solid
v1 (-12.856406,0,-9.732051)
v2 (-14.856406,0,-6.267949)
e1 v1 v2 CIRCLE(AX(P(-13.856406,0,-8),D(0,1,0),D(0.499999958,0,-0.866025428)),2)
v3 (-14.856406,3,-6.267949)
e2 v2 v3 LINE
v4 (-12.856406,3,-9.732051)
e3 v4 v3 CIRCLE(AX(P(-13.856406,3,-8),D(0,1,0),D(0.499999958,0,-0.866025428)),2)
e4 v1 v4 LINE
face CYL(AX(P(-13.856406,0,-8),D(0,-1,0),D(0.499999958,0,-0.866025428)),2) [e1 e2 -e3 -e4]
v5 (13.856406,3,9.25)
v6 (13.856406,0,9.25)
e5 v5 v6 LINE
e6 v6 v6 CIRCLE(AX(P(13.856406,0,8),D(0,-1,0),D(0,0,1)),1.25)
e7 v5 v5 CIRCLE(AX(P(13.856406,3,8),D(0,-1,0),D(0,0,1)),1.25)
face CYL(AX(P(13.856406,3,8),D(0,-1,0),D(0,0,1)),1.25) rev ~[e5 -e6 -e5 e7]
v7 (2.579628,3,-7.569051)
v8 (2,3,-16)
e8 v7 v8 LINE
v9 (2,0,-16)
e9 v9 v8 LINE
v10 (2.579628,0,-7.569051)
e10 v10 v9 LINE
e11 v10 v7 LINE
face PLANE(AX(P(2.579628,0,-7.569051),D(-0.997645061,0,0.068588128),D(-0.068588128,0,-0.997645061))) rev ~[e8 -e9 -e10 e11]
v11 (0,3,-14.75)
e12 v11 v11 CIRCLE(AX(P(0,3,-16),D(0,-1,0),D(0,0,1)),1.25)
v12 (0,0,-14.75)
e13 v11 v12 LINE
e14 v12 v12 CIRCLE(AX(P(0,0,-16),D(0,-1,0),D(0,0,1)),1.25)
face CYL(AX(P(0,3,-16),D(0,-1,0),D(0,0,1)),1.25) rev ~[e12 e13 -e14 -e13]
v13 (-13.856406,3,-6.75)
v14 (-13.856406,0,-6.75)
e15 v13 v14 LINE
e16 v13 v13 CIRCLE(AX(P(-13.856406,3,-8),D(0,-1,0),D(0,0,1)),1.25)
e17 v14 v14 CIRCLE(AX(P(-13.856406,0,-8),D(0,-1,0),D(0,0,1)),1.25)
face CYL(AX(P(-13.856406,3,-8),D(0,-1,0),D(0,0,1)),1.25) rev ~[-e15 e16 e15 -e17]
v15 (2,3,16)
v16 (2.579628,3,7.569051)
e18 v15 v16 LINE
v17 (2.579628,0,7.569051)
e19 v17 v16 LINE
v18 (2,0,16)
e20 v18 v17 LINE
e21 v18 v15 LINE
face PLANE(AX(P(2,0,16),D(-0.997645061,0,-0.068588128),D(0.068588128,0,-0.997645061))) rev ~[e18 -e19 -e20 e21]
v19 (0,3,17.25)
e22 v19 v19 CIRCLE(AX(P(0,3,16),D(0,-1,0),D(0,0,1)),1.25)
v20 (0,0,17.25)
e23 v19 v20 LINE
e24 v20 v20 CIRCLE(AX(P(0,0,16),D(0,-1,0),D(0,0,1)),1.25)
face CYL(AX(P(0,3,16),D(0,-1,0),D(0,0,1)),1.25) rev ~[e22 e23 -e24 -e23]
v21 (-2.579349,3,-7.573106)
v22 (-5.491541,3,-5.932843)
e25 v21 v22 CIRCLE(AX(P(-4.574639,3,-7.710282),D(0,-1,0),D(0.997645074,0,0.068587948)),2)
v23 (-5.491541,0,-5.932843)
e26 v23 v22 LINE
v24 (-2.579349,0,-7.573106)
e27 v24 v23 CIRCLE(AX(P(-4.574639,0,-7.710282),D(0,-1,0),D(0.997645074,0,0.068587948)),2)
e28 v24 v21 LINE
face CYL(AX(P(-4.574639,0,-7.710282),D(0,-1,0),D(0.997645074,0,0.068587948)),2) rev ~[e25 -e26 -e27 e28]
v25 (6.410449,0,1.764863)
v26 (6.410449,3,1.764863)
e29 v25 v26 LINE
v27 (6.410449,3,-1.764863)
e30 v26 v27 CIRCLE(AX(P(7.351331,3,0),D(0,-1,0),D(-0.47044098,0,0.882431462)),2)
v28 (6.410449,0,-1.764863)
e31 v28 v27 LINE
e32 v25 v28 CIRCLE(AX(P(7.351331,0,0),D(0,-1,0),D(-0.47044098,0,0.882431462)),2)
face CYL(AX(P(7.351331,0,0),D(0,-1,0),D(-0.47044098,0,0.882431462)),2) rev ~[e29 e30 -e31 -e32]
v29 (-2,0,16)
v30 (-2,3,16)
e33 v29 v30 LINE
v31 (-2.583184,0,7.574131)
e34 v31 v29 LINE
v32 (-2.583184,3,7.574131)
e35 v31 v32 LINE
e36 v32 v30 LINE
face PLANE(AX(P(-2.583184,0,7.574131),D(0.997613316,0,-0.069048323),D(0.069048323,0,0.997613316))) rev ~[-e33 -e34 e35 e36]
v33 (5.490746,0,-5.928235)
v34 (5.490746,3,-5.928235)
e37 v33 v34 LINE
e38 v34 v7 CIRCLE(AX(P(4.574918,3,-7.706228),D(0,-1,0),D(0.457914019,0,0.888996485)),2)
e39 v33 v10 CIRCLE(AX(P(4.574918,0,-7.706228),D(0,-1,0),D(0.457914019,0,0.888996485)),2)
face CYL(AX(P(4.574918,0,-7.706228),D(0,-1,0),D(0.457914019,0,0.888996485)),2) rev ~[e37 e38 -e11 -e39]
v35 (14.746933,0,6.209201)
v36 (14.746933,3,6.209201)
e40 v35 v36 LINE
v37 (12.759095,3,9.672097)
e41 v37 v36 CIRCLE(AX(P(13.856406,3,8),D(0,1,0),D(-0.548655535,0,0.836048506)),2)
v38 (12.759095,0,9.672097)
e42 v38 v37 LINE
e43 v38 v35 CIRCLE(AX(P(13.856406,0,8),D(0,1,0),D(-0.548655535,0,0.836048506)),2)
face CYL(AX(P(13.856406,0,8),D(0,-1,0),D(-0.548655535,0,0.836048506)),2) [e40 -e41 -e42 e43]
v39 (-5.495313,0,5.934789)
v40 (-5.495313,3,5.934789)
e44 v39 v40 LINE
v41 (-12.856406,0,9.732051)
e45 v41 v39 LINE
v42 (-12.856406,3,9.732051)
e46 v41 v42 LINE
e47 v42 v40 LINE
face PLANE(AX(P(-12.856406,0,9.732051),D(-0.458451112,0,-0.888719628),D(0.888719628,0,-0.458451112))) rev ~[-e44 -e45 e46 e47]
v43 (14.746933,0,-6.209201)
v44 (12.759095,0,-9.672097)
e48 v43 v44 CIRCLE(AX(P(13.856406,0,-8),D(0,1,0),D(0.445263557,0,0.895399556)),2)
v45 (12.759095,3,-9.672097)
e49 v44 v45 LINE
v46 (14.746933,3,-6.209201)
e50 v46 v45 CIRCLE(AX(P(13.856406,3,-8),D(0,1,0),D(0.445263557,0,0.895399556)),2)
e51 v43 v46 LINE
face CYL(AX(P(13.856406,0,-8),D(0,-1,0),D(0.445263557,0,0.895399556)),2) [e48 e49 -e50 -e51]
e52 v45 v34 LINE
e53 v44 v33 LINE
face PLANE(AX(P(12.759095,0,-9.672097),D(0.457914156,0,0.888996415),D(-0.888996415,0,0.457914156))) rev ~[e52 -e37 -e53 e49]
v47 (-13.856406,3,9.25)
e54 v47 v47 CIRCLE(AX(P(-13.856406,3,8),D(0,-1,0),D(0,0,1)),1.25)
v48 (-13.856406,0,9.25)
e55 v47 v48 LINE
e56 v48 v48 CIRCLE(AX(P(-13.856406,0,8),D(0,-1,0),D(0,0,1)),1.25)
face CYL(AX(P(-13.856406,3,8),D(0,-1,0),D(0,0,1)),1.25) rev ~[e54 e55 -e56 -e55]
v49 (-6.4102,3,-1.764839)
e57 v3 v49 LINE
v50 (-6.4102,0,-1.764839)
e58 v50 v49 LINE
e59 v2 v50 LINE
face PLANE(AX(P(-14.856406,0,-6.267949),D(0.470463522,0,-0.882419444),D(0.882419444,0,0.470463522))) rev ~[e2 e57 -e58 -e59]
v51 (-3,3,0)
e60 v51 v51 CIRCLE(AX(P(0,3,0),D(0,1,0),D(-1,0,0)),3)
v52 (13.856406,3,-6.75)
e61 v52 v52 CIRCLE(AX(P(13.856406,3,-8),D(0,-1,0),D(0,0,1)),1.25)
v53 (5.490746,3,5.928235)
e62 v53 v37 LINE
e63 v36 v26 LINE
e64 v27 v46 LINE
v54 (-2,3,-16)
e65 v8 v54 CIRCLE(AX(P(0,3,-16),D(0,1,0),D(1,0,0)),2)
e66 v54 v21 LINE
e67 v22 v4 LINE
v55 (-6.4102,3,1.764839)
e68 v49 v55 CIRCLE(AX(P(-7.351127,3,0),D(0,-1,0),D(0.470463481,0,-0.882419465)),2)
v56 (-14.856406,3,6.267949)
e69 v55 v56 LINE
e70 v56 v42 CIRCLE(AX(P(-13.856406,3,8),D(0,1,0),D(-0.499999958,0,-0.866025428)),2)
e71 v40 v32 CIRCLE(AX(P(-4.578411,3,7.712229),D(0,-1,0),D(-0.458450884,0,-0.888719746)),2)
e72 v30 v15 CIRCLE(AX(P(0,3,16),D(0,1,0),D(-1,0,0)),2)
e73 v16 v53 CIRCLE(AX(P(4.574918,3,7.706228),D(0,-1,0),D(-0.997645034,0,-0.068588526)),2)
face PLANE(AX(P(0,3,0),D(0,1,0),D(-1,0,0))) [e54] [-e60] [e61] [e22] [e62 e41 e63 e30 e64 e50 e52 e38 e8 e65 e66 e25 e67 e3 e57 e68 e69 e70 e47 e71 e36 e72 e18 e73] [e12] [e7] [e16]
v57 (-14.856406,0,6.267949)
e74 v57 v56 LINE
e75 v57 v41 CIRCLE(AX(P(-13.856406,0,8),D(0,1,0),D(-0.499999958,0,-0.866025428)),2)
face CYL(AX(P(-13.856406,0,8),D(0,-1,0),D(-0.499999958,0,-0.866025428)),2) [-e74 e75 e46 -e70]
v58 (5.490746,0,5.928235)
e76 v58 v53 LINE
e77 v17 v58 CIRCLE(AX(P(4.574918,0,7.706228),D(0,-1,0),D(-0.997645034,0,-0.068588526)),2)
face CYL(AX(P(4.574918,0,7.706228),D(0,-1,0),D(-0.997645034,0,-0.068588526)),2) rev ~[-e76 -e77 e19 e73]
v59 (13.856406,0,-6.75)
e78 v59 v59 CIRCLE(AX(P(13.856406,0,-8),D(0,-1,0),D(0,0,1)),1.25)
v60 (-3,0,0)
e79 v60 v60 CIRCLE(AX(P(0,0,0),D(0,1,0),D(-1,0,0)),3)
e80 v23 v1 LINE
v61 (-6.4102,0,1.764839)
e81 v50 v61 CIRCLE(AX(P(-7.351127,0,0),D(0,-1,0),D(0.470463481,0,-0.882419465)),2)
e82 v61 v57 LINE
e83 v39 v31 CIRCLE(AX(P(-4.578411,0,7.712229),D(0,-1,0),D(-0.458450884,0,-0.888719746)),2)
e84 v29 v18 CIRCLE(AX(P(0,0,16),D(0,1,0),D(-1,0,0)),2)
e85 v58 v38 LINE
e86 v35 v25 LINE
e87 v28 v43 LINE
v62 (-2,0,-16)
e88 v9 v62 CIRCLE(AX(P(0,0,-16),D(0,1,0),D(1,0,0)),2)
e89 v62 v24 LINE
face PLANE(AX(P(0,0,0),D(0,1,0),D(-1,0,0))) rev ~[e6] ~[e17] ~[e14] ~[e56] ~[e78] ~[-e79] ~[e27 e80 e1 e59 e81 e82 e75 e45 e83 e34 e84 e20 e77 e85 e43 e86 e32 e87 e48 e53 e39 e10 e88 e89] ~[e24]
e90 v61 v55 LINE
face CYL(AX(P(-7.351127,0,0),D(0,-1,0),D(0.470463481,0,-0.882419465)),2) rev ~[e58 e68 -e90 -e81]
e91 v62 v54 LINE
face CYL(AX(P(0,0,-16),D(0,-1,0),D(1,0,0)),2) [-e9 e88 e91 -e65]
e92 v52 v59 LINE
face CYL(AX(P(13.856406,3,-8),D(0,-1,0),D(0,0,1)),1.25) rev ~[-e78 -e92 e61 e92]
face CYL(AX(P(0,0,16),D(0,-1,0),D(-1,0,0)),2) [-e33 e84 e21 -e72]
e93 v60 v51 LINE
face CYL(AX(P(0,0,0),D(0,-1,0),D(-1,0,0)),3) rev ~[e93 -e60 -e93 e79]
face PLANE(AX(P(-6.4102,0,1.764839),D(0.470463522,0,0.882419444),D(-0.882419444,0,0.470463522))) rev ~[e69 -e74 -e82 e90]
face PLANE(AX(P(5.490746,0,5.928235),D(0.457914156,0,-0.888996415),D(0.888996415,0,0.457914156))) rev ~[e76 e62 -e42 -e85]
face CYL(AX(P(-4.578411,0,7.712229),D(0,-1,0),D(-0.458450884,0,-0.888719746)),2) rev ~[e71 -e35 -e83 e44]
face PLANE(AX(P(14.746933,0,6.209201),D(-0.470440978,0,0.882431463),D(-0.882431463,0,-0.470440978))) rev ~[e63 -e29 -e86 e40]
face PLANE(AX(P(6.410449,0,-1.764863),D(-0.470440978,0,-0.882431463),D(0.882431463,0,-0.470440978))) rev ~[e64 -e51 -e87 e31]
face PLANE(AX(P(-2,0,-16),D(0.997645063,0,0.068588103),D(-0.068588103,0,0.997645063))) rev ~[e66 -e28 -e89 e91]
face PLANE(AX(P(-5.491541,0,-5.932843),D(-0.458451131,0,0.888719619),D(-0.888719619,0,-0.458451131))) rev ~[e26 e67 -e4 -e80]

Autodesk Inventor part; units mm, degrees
ref_plane "YZ Plane" through (0, 0, 0) normal (1, 0, 0) x (0, 1, 0)
ref_plane "XZ Plane" through (0, 0, 0) normal (0, 1, 0) x (-1, 0, 0)
ref_plane "XY Plane" through (0, 0, 0) normal (0, 0, 1) x (1, 0, 0)
sketch "Boceto1" plane through (0, 0, 0) normal (0, 1, 0) x (-1, 0, 0)
  circle A0 centre (0, -16) radius 2
  circle A1 centre (13.856406, -8) radius 2
  circle A2 centre (13.856406, 8) radius 2
  circle A3 centre (0, 16) radius 2
  circle A4 centre (-13.856406, 8) radius 2
  circle A5 centre (-13.856406, -8) radius 2
  line L0 (-12.759095, -9.672097) -> (-5.490746, -5.928235)
  line L1 (-6.410449, -1.764863) -> (-14.746933, -6.209201)
  line L2 (-6.410449, 1.764863) -> (-14.746933, 6.209201)
  line L3 (-12.759095, 9.672097) -> (-5.490746, 5.928235)
  line L4 (2, 16) -> (2.583184, 7.574131)
  line L5 (-2, 16) -> (-2.579628, 7.569051)
  line L6 (2.579349, -7.573106) -> (2, -16)
  line L7 (-2.579628, -7.569051) -> (-2, -16)
  line L8 (12.856406, 9.732051) -> (5.495313, 5.934789)
  line L9 (14.856406, 6.267949) -> (6.4102, 1.764839)
  line L10 (14.856406, -6.267949) -> (6.4102, -1.764839)
  line L11 (12.856406, -9.732051) -> (5.491541, -5.932843)
  circle A6 centre (0, 0) radius 3
  arc A7 (-6.410449, -1.764863) -> (-6.410449, 1.764863) centre (-7.351331, 0) ccw
  arc A8 (-2.579628, -7.569051) -> (-5.490746, -5.928235) centre (-4.574918, -7.706228) ccw
  arc A9 (5.491541, -5.932843) -> (2.579349, -7.573106) centre (4.574639, -7.710282) ccw
  arc A10 (6.4102, 1.764839) -> (6.4102, -1.764839) centre (7.351127, 0) ccw
  arc A11 (2.583184, 7.574131) -> (5.495313, 5.934789) centre (4.578411, 7.712228) ccw
  arc A12 (-5.490746, 5.928235) -> (-2.579628, 7.569051) centre (-4.574918, 7.706228) ccw
  point P0 (0, -3.1)
  point P1 (-3.1, 0)
  point P2 (0, 3.1)
  point P3 (3.1, 0)
  dimension "d17" = 360
  dimension "d19" = 6
  dimension "d20" = 2
sketch "Boceto1 outline for Extrusión1" plane through (0, 0, 0) normal (0, 1, 0) x (-1, 0, 0)
  arc A0 (5.495313, 5.934789) -> (2.583184, 7.574131) centre (4.578411, 7.712228) cw
  line L0 (12.856406, 9.732051) -> (5.495313, 5.934789)
  line L1 (2.583184, 7.574131) -> (2, 16)
  arc A1 (14.856406, 6.267949) -> (12.856406, 9.732051) centre (13.856406, 8) ccw
  arc A2 (2, 16) -> (-2, 16) centre (0, 16) ccw
  line L2 (6.4102, 1.764839) -> (14.856406, 6.267949)
  line L3 (-2, 16) -> (-2.579628, 7.569051)
  arc A3 (6.4102, -1.764839) -> (6.4102, 1.764839) centre (7.351127, 0) cw
  arc A4 (-2.579628, 7.569051) -> (-5.490746, 5.928235) centre (-4.574918, 7.706228) cw
  line L4 (14.856406, -6.267949) -> (6.4102, -1.764839)
  line L5 (-5.490746, 5.928235) -> (-12.759095, 9.672097)
  arc A5 (12.856406, -9.732051) -> (14.856406, -6.267949) centre (13.856406, -8) ccw
  arc A6 (-12.759095, 9.672097) -> (-14.746933, 6.209201) centre (-13.856406, 8) ccw
  line L6 (5.491541, -5.932843) -> (12.856406, -9.732051)
  line L7 (-14.746933, 6.209201) -> (-6.410449, 1.764863)
  arc A7 (2.579349, -7.573106) -> (5.491541, -5.932843) centre (4.574639, -7.710282) cw
  arc A8 (-6.410449, 1.764863) -> (-6.410449, -1.764863) centre (-7.351331, 0) cw
  line L8 (2, -16) -> (2.579349, -7.573106)
  line L9 (-6.410449, -1.764863) -> (-14.746933, -6.209201)
  arc A9 (-2, -16) -> (2, -16) centre (0, -16) ccw
  arc A10 (-14.746933, -6.209201) -> (-12.759095, -9.672097) centre (-13.856406, -8) ccw
  line L10 (-2.579628, -7.569051) -> (-2, -16)
  line L11 (-12.759095, -9.672097) -> (-5.490746, -5.928235)
  arc A11 (-5.490746, -5.928235) -> (-2.579628, -7.569051) centre (-4.574918, -7.706228) cw
  circle A12 centre (0, 0) radius 3
extrude "Extrusión1" add sketch "Boceto1 outline for Extrusión1" along normal blind 3
sketch "Boceto2" plane through (0, 3, 0) normal (0, 1, 0) x (1, 0, 0)
  arc A0 (-14.856406, -6.267949) -> (-12.856406, -9.732051) centre (-13.856406, -8) ccw
  circle A1 centre (-13.856406, -8) radius 1.25
  arc A2 (-2, -16) -> (2, -16) centre (0, -16) ccw
  circle A3 centre (0, -16) radius 1.25
  arc A4 (-12.856406, 9.732051) -> (-14.856406, 6.267949) centre (-13.856406, 8) ccw
  circle A5 centre (-13.856406, 8) radius 1.25
  arc A6 (2, 16) -> (-2, 16) centre (0, 16) ccw
  circle A7 centre (0, 16) radius 1.25
  arc A8 (14.746933, 6.209201) -> (12.759095, 9.672097) centre (13.856406, 8) ccw
  circle A9 centre (13.856406, 8) radius 1.25
  arc A10 (12.759095, -9.672097) -> (14.746933, -6.209201) centre (13.856406, -8) ccw
  circle A11 centre (13.856406, -8) radius 1.25
  point P0 (0, 0)
  dimension "d23" = 2.5
  dimension "d24" = 2.5
  dimension "d25" = 2.5
  dimension "d26" = 2.5
  dimension "d27" = 2.5
  dimension "d28" = 2.5
hole "Agujero1" at (0, 3, -16) at (-13.856406, 3, -8) at (0, 3, 16) at (13.856406, 3, 8) at (13.856406, 3, -8) direction (0, -1, 0) diameter 2.5 end through all
sketch "Boceto3" plane through (0, 3, 0) normal (0, 1, 0) x (1, 0, 0)
  arc A0 (-14.856406, -6.267949) -> (-12.856406, -9.732051) centre (-13.856406, -8) ccw
  circle A1 centre (-13.856406, -8) radius 1.25
  point P0 (0, 0)
  dimension "d36" = 2.5
hole "Agujero2" at (-13.856406, 3, 8) direction (0, -1, 0) diameter 2.5 end through all
sketch "Boceto4" plane through (0, 3, 0) normal (0, 1, 0) x (1, 0, 0)
  point P0 (0, 0)
properties part number "Extension"
